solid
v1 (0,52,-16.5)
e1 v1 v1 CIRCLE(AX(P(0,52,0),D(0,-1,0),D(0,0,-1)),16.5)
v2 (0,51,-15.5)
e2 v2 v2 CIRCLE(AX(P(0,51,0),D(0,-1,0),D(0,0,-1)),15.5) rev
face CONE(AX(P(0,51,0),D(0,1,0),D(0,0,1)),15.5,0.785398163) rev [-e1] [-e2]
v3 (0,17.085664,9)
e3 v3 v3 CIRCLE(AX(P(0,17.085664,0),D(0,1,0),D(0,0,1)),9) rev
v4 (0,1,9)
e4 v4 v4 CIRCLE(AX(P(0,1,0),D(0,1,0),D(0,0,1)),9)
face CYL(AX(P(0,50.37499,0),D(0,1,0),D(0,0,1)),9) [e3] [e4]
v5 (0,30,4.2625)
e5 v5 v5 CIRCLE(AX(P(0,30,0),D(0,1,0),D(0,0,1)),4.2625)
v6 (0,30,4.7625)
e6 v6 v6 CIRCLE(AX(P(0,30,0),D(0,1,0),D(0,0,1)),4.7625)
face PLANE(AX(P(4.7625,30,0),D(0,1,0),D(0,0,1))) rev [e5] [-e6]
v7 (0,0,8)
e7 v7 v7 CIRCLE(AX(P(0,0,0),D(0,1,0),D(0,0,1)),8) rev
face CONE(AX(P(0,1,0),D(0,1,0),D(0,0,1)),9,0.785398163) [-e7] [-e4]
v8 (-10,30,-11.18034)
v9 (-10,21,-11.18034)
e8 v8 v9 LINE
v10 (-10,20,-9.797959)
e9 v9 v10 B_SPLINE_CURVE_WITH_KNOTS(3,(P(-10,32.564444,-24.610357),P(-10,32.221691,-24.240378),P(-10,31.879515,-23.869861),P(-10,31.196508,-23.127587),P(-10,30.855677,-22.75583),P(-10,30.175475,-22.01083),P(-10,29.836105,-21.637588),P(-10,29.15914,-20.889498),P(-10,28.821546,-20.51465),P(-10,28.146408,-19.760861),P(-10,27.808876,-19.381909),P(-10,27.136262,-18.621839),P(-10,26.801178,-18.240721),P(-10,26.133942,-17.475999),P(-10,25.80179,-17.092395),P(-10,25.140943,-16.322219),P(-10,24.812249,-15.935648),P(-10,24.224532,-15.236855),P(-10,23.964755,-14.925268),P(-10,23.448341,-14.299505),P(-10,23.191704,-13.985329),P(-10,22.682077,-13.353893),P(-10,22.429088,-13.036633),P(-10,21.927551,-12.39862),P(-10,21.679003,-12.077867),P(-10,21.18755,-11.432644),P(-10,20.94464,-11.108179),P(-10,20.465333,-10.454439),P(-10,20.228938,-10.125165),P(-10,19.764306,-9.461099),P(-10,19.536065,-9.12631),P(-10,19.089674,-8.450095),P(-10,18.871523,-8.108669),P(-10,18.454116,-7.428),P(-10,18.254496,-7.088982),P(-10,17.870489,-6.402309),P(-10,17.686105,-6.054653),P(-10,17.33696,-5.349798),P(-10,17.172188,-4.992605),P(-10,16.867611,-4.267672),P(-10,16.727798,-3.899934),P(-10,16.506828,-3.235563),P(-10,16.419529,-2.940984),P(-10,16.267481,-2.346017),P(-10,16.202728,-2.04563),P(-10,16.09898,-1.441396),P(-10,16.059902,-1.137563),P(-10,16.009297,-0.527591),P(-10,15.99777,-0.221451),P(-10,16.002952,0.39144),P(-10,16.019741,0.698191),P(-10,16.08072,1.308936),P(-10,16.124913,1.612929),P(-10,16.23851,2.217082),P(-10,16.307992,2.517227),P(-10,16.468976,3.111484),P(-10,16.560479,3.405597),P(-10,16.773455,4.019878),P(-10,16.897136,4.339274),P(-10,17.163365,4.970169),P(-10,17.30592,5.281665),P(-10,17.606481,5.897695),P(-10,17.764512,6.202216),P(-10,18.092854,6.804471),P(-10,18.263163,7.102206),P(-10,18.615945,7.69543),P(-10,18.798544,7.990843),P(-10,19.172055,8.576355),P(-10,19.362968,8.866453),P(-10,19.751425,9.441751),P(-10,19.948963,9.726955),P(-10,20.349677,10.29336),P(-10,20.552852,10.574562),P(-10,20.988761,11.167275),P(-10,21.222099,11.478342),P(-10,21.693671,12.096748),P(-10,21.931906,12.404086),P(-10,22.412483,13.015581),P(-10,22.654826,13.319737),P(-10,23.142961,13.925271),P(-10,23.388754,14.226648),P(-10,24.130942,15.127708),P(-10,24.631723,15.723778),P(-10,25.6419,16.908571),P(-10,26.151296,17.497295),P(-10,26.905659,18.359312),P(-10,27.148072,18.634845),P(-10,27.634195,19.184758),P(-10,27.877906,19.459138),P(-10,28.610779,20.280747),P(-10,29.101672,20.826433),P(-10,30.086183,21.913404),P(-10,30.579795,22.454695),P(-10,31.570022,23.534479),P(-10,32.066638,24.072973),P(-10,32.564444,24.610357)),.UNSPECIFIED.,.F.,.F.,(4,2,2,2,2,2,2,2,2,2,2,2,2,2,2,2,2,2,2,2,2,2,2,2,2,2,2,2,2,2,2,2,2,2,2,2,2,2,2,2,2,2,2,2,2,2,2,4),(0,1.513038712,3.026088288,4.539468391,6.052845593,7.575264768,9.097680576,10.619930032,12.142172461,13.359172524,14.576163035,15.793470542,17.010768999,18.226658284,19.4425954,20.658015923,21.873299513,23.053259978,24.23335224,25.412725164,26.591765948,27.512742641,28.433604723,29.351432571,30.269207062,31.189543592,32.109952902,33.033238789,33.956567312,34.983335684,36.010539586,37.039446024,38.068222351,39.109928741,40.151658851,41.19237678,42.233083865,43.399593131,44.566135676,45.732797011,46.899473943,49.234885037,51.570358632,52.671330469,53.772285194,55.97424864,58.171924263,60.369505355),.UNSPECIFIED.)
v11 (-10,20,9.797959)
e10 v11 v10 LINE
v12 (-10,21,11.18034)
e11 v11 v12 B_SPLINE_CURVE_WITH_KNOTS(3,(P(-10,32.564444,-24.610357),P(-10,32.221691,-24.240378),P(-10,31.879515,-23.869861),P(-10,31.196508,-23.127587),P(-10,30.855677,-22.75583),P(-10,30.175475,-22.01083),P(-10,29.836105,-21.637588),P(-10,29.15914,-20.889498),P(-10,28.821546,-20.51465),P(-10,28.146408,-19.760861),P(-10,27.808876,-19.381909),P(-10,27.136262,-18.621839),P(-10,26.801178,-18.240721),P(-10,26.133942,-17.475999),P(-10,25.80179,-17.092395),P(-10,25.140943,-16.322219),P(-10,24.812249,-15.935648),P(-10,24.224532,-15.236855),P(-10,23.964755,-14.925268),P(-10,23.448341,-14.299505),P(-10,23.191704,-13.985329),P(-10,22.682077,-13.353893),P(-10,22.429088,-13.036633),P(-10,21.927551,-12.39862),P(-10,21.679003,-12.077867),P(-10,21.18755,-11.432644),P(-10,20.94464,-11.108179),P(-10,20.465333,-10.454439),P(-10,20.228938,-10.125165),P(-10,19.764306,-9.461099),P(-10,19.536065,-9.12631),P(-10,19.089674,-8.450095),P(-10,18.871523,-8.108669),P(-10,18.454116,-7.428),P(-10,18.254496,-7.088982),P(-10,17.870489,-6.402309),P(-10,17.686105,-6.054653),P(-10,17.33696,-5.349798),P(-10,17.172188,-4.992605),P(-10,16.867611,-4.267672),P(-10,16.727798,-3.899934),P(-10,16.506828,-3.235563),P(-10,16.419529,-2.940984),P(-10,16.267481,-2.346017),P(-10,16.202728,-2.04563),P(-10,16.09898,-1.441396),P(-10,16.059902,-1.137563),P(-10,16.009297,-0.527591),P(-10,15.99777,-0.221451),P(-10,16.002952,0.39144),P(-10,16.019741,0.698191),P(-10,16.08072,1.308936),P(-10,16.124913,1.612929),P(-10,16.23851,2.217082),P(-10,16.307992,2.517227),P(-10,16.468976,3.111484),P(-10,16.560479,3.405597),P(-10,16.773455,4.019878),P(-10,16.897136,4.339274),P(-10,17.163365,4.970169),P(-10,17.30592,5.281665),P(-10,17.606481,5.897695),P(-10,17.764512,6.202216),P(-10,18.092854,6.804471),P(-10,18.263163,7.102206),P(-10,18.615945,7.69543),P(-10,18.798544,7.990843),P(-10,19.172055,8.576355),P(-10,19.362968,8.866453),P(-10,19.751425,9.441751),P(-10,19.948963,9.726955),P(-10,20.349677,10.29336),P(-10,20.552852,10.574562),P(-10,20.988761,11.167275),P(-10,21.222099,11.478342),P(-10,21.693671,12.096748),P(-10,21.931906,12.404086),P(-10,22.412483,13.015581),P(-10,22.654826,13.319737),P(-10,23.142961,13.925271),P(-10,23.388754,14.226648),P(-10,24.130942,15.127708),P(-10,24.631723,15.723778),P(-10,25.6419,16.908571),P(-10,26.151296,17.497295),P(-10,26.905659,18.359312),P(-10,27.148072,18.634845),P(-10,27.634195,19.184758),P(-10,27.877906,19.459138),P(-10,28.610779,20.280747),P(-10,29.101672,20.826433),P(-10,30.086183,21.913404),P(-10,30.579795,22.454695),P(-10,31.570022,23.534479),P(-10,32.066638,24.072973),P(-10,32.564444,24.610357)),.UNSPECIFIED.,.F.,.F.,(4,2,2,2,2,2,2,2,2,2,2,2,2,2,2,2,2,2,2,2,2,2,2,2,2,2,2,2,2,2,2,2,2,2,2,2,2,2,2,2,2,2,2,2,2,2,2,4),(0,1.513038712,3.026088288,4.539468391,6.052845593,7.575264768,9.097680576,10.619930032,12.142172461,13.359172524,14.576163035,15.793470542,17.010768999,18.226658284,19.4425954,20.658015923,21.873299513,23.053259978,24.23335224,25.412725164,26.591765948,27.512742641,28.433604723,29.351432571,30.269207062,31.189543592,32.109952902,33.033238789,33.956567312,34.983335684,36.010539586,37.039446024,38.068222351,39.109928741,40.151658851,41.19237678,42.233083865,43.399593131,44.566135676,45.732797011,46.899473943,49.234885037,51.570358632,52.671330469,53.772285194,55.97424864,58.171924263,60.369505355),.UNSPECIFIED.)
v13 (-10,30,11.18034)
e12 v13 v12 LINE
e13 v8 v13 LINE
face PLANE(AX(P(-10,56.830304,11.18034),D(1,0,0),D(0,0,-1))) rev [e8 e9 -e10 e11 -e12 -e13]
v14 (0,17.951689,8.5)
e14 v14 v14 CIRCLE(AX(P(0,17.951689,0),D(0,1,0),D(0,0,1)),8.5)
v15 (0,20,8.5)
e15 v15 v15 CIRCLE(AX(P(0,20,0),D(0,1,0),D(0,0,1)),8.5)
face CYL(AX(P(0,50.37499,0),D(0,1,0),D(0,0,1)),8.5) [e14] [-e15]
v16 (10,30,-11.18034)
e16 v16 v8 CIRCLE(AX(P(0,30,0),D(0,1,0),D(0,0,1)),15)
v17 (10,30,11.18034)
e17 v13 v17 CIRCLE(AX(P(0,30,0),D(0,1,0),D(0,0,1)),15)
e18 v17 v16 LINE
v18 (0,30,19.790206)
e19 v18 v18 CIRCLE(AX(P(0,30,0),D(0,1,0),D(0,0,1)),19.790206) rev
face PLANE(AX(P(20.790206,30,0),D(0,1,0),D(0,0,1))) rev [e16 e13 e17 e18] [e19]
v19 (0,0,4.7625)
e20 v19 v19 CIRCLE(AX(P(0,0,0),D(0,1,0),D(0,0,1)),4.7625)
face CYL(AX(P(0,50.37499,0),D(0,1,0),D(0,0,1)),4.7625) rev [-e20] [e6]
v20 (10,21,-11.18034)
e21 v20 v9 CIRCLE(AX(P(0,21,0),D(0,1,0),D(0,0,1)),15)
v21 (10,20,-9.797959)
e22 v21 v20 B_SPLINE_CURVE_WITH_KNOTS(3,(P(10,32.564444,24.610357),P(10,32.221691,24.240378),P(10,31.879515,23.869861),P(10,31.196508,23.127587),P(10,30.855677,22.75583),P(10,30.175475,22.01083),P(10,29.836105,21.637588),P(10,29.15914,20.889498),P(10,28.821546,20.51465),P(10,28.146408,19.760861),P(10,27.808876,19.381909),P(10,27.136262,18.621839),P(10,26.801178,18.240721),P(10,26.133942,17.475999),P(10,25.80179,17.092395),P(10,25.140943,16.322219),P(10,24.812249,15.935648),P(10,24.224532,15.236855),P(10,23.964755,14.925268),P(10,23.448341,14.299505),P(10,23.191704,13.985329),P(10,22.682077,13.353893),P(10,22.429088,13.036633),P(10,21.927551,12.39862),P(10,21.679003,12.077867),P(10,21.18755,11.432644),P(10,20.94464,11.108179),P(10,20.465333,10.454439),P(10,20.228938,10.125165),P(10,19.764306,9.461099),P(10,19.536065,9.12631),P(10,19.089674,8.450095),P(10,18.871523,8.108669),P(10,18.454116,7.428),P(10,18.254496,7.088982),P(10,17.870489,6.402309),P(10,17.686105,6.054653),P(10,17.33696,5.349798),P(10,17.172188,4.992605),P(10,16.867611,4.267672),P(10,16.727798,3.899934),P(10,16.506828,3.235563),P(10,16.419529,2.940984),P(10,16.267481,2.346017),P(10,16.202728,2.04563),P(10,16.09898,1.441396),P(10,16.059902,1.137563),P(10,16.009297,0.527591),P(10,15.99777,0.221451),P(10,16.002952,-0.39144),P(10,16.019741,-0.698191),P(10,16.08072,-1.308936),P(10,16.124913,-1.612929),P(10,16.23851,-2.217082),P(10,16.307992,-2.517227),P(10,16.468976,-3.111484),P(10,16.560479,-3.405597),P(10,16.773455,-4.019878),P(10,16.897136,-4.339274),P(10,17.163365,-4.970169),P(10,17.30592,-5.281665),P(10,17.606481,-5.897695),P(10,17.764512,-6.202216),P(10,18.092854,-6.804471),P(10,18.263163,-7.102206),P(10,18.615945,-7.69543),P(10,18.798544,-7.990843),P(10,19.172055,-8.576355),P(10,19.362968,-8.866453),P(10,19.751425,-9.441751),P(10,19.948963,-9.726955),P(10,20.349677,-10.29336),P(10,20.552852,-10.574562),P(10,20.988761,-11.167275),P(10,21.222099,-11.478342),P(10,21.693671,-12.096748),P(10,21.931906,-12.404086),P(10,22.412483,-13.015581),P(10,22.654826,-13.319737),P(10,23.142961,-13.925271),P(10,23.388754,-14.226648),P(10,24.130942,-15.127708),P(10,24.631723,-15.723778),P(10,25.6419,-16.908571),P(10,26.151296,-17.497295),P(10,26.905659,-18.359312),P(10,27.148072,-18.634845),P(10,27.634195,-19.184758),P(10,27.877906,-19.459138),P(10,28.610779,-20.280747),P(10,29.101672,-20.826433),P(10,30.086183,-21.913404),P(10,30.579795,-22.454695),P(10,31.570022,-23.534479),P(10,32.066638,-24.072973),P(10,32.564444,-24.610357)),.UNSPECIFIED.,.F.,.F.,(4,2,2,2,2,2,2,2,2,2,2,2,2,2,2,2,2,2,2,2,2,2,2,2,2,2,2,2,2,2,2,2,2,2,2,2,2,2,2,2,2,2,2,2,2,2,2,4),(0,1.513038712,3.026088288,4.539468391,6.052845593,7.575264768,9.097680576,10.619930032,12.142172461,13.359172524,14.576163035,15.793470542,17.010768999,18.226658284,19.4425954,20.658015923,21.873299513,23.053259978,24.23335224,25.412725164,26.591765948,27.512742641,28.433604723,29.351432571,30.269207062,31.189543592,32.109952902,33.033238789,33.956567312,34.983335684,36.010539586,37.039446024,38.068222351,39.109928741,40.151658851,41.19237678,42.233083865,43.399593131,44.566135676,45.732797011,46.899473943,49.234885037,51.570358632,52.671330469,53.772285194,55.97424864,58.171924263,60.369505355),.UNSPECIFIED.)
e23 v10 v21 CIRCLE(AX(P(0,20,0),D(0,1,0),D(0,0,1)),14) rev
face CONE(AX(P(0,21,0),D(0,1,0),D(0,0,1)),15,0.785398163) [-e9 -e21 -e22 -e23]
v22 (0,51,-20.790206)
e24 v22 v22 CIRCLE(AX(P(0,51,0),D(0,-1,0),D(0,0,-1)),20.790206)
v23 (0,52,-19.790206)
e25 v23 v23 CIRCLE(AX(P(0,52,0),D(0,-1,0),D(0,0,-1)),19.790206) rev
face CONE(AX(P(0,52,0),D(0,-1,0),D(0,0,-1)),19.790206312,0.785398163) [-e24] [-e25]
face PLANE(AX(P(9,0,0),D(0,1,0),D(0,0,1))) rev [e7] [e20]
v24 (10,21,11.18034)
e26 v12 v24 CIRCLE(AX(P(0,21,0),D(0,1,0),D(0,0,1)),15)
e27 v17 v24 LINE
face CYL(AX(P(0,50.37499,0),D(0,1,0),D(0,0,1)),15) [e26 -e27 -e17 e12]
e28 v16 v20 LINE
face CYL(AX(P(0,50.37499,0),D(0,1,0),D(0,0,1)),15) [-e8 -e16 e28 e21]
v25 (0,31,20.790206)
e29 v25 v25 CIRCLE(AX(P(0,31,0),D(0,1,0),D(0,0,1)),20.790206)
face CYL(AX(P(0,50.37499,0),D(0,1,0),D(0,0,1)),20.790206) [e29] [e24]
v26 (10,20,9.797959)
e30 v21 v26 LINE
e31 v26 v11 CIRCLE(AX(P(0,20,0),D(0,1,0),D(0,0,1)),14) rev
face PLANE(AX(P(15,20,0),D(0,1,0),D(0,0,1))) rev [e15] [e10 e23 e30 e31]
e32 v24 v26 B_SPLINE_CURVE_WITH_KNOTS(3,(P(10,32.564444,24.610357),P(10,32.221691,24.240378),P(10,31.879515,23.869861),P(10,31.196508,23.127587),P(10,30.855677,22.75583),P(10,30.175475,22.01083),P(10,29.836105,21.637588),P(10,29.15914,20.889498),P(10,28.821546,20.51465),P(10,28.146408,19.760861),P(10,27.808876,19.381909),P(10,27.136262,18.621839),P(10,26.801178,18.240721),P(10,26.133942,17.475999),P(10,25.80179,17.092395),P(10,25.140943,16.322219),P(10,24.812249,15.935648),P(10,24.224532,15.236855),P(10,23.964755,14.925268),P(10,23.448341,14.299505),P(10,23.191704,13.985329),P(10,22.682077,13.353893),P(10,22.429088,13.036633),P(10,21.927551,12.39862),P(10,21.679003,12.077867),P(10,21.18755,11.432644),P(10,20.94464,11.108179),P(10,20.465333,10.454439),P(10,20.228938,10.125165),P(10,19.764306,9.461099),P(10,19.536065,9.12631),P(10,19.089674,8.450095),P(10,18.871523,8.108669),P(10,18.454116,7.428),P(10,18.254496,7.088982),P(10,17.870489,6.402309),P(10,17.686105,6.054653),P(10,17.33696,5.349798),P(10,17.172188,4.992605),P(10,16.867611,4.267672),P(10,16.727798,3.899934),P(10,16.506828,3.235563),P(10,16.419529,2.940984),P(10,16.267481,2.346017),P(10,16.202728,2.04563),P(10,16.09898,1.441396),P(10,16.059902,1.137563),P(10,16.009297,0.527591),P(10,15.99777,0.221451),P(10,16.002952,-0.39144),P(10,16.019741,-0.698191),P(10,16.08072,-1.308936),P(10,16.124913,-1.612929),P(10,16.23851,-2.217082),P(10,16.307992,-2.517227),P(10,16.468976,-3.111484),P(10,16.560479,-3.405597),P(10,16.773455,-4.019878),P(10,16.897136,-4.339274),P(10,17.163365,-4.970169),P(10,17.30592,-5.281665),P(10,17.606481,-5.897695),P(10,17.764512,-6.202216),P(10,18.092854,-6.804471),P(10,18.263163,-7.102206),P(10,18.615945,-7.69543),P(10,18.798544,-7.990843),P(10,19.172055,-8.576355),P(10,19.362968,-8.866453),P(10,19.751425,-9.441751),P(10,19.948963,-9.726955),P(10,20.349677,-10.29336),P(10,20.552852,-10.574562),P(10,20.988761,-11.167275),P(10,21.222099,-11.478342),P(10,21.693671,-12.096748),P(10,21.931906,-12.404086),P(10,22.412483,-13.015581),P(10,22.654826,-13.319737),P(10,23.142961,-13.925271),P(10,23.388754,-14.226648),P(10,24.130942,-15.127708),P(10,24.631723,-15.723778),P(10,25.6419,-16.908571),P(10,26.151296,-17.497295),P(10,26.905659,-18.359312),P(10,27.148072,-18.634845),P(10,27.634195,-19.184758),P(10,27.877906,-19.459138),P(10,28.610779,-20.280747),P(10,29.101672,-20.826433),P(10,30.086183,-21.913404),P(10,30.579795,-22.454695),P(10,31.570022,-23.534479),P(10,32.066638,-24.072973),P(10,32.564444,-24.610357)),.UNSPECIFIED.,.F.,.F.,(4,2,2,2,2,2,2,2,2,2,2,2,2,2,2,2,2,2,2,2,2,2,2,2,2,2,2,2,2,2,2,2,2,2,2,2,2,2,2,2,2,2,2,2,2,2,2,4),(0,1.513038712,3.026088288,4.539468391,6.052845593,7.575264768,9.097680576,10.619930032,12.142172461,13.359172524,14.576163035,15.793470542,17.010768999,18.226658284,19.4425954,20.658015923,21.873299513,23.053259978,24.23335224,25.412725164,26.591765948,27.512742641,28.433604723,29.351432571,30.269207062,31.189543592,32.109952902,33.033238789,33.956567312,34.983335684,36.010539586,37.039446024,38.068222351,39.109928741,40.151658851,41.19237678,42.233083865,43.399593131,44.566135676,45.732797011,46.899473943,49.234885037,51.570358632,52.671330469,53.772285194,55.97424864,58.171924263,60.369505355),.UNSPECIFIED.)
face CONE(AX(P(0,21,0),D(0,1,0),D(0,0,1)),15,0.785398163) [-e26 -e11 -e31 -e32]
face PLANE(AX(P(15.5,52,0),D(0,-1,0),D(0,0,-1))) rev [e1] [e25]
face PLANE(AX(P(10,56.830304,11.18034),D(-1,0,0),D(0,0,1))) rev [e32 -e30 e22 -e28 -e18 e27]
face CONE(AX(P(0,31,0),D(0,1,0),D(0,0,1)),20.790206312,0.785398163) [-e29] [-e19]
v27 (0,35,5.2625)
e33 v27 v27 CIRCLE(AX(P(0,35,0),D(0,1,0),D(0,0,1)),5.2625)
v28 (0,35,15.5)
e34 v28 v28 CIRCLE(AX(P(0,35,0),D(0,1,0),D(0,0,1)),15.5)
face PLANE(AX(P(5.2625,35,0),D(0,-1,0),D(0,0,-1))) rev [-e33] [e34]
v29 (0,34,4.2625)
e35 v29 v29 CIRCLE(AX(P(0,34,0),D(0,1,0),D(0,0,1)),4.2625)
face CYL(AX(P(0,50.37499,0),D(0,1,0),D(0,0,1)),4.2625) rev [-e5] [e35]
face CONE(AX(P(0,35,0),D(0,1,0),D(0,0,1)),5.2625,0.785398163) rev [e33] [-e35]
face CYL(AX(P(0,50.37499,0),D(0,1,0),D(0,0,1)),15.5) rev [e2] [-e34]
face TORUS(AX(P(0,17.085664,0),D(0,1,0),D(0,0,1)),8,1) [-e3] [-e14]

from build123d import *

# Parameters (mm, degrees)
CHAFL_N1_SIZE         = 1
REDONDEO1_R           = 1
CHAFL_N2_SIZE         = 1
CROQUIS3_W            = 14.730869345
CROQUIS3_H            = 22.360679774
CORTAR_EXTRUIR1_DEPTH = 30


with BuildPart() as part:
    # Croquis1 → Revolución1 (revolve)
    with BuildSketch(Plane.XY, mode=Mode.PRIVATE) as revoluci_n1_sk:
        Polygon((15.5, 52), (20.790206312, 52), (20.790206312, 30), (15, 30), (15, 20), (8.5, 20), (8.5, 17.951688966), (9, 17.951688966), (9, 0), (4.7625, 0), (4.7625, 30), (4.2625, 30), (4.2625, 34), (5.2625, 35), (15.5, 35), align=None)
    revolve(revoluci_n1_sk.sketch.rotate(Axis((0, 50.374990084, 0), (0, -1, 0)), 90), axis=Axis((0, 50.374990084, 0), (0, -1, 0)))

    # Chaflán1
    chafl_n1_edges = [part.edges().sort_by_distance(p)[0] for p in [
        (0, 0, -9),
    ]]
    chamfer(chafl_n1_edges, length=CHAFL_N1_SIZE)

    # Redondeo1
    # the kernel refuses this fillet: 1 mm, written as the material it takes off along each edge
    with BuildSketch(Plane(origin=(0, 17.951688966, 0), x_dir=(0, 0, 1), z_dir=(1, 0, 0))) as redondeo1_piece_1:
        with BuildLine():
            CenterArc((8, 0.866025404), REDONDEO1_R, 300, 60)
            Line((8.5, 0), (8.51, -0.017320508))
            ThreePointArc((8.51, -0.017320508), (8.75, -0.02), (9, -0.02))
            Line((9, -0.02), (9.02, 0))
            Line((9.02, 0), (9.02, 0.866025404))
            Line((9.02, 0.866025404), (9, 0.866025404))
        make_face()
    revolve(axis=Axis((0, 17.951688966, 0), (0, -1, 0)), mode=Mode.SUBTRACT)

    # Chaflán2
    chafl_n2_edges = [part.edges().sort_by_distance(p)[0] for p in [
        (0, 20, -15),
        (0, 30, -20.790206312),
        (0, 52, -20.790206312),
        (0, 52, -15.5),
    ]]
    chamfer(chafl_n2_edges, length=CHAFL_N2_SIZE)

    # Croquis3 → Cortar-Extruir1 (cut)
    with BuildSketch(Plane.XZ):
        Polygon((10, 11.180339887), (10, -11.180339887), (24.245950338, -11.180339887), (24.827853146, 11.180339887), align=None)
        with Locations((-17.365434673, 0)):
            Rectangle(CROQUIS3_W, CROQUIS3_H)
    extrude(amount=-CORTAR_EXTRUIR1_DEPTH, mode=Mode.SUBTRACT)


solid = part.part
